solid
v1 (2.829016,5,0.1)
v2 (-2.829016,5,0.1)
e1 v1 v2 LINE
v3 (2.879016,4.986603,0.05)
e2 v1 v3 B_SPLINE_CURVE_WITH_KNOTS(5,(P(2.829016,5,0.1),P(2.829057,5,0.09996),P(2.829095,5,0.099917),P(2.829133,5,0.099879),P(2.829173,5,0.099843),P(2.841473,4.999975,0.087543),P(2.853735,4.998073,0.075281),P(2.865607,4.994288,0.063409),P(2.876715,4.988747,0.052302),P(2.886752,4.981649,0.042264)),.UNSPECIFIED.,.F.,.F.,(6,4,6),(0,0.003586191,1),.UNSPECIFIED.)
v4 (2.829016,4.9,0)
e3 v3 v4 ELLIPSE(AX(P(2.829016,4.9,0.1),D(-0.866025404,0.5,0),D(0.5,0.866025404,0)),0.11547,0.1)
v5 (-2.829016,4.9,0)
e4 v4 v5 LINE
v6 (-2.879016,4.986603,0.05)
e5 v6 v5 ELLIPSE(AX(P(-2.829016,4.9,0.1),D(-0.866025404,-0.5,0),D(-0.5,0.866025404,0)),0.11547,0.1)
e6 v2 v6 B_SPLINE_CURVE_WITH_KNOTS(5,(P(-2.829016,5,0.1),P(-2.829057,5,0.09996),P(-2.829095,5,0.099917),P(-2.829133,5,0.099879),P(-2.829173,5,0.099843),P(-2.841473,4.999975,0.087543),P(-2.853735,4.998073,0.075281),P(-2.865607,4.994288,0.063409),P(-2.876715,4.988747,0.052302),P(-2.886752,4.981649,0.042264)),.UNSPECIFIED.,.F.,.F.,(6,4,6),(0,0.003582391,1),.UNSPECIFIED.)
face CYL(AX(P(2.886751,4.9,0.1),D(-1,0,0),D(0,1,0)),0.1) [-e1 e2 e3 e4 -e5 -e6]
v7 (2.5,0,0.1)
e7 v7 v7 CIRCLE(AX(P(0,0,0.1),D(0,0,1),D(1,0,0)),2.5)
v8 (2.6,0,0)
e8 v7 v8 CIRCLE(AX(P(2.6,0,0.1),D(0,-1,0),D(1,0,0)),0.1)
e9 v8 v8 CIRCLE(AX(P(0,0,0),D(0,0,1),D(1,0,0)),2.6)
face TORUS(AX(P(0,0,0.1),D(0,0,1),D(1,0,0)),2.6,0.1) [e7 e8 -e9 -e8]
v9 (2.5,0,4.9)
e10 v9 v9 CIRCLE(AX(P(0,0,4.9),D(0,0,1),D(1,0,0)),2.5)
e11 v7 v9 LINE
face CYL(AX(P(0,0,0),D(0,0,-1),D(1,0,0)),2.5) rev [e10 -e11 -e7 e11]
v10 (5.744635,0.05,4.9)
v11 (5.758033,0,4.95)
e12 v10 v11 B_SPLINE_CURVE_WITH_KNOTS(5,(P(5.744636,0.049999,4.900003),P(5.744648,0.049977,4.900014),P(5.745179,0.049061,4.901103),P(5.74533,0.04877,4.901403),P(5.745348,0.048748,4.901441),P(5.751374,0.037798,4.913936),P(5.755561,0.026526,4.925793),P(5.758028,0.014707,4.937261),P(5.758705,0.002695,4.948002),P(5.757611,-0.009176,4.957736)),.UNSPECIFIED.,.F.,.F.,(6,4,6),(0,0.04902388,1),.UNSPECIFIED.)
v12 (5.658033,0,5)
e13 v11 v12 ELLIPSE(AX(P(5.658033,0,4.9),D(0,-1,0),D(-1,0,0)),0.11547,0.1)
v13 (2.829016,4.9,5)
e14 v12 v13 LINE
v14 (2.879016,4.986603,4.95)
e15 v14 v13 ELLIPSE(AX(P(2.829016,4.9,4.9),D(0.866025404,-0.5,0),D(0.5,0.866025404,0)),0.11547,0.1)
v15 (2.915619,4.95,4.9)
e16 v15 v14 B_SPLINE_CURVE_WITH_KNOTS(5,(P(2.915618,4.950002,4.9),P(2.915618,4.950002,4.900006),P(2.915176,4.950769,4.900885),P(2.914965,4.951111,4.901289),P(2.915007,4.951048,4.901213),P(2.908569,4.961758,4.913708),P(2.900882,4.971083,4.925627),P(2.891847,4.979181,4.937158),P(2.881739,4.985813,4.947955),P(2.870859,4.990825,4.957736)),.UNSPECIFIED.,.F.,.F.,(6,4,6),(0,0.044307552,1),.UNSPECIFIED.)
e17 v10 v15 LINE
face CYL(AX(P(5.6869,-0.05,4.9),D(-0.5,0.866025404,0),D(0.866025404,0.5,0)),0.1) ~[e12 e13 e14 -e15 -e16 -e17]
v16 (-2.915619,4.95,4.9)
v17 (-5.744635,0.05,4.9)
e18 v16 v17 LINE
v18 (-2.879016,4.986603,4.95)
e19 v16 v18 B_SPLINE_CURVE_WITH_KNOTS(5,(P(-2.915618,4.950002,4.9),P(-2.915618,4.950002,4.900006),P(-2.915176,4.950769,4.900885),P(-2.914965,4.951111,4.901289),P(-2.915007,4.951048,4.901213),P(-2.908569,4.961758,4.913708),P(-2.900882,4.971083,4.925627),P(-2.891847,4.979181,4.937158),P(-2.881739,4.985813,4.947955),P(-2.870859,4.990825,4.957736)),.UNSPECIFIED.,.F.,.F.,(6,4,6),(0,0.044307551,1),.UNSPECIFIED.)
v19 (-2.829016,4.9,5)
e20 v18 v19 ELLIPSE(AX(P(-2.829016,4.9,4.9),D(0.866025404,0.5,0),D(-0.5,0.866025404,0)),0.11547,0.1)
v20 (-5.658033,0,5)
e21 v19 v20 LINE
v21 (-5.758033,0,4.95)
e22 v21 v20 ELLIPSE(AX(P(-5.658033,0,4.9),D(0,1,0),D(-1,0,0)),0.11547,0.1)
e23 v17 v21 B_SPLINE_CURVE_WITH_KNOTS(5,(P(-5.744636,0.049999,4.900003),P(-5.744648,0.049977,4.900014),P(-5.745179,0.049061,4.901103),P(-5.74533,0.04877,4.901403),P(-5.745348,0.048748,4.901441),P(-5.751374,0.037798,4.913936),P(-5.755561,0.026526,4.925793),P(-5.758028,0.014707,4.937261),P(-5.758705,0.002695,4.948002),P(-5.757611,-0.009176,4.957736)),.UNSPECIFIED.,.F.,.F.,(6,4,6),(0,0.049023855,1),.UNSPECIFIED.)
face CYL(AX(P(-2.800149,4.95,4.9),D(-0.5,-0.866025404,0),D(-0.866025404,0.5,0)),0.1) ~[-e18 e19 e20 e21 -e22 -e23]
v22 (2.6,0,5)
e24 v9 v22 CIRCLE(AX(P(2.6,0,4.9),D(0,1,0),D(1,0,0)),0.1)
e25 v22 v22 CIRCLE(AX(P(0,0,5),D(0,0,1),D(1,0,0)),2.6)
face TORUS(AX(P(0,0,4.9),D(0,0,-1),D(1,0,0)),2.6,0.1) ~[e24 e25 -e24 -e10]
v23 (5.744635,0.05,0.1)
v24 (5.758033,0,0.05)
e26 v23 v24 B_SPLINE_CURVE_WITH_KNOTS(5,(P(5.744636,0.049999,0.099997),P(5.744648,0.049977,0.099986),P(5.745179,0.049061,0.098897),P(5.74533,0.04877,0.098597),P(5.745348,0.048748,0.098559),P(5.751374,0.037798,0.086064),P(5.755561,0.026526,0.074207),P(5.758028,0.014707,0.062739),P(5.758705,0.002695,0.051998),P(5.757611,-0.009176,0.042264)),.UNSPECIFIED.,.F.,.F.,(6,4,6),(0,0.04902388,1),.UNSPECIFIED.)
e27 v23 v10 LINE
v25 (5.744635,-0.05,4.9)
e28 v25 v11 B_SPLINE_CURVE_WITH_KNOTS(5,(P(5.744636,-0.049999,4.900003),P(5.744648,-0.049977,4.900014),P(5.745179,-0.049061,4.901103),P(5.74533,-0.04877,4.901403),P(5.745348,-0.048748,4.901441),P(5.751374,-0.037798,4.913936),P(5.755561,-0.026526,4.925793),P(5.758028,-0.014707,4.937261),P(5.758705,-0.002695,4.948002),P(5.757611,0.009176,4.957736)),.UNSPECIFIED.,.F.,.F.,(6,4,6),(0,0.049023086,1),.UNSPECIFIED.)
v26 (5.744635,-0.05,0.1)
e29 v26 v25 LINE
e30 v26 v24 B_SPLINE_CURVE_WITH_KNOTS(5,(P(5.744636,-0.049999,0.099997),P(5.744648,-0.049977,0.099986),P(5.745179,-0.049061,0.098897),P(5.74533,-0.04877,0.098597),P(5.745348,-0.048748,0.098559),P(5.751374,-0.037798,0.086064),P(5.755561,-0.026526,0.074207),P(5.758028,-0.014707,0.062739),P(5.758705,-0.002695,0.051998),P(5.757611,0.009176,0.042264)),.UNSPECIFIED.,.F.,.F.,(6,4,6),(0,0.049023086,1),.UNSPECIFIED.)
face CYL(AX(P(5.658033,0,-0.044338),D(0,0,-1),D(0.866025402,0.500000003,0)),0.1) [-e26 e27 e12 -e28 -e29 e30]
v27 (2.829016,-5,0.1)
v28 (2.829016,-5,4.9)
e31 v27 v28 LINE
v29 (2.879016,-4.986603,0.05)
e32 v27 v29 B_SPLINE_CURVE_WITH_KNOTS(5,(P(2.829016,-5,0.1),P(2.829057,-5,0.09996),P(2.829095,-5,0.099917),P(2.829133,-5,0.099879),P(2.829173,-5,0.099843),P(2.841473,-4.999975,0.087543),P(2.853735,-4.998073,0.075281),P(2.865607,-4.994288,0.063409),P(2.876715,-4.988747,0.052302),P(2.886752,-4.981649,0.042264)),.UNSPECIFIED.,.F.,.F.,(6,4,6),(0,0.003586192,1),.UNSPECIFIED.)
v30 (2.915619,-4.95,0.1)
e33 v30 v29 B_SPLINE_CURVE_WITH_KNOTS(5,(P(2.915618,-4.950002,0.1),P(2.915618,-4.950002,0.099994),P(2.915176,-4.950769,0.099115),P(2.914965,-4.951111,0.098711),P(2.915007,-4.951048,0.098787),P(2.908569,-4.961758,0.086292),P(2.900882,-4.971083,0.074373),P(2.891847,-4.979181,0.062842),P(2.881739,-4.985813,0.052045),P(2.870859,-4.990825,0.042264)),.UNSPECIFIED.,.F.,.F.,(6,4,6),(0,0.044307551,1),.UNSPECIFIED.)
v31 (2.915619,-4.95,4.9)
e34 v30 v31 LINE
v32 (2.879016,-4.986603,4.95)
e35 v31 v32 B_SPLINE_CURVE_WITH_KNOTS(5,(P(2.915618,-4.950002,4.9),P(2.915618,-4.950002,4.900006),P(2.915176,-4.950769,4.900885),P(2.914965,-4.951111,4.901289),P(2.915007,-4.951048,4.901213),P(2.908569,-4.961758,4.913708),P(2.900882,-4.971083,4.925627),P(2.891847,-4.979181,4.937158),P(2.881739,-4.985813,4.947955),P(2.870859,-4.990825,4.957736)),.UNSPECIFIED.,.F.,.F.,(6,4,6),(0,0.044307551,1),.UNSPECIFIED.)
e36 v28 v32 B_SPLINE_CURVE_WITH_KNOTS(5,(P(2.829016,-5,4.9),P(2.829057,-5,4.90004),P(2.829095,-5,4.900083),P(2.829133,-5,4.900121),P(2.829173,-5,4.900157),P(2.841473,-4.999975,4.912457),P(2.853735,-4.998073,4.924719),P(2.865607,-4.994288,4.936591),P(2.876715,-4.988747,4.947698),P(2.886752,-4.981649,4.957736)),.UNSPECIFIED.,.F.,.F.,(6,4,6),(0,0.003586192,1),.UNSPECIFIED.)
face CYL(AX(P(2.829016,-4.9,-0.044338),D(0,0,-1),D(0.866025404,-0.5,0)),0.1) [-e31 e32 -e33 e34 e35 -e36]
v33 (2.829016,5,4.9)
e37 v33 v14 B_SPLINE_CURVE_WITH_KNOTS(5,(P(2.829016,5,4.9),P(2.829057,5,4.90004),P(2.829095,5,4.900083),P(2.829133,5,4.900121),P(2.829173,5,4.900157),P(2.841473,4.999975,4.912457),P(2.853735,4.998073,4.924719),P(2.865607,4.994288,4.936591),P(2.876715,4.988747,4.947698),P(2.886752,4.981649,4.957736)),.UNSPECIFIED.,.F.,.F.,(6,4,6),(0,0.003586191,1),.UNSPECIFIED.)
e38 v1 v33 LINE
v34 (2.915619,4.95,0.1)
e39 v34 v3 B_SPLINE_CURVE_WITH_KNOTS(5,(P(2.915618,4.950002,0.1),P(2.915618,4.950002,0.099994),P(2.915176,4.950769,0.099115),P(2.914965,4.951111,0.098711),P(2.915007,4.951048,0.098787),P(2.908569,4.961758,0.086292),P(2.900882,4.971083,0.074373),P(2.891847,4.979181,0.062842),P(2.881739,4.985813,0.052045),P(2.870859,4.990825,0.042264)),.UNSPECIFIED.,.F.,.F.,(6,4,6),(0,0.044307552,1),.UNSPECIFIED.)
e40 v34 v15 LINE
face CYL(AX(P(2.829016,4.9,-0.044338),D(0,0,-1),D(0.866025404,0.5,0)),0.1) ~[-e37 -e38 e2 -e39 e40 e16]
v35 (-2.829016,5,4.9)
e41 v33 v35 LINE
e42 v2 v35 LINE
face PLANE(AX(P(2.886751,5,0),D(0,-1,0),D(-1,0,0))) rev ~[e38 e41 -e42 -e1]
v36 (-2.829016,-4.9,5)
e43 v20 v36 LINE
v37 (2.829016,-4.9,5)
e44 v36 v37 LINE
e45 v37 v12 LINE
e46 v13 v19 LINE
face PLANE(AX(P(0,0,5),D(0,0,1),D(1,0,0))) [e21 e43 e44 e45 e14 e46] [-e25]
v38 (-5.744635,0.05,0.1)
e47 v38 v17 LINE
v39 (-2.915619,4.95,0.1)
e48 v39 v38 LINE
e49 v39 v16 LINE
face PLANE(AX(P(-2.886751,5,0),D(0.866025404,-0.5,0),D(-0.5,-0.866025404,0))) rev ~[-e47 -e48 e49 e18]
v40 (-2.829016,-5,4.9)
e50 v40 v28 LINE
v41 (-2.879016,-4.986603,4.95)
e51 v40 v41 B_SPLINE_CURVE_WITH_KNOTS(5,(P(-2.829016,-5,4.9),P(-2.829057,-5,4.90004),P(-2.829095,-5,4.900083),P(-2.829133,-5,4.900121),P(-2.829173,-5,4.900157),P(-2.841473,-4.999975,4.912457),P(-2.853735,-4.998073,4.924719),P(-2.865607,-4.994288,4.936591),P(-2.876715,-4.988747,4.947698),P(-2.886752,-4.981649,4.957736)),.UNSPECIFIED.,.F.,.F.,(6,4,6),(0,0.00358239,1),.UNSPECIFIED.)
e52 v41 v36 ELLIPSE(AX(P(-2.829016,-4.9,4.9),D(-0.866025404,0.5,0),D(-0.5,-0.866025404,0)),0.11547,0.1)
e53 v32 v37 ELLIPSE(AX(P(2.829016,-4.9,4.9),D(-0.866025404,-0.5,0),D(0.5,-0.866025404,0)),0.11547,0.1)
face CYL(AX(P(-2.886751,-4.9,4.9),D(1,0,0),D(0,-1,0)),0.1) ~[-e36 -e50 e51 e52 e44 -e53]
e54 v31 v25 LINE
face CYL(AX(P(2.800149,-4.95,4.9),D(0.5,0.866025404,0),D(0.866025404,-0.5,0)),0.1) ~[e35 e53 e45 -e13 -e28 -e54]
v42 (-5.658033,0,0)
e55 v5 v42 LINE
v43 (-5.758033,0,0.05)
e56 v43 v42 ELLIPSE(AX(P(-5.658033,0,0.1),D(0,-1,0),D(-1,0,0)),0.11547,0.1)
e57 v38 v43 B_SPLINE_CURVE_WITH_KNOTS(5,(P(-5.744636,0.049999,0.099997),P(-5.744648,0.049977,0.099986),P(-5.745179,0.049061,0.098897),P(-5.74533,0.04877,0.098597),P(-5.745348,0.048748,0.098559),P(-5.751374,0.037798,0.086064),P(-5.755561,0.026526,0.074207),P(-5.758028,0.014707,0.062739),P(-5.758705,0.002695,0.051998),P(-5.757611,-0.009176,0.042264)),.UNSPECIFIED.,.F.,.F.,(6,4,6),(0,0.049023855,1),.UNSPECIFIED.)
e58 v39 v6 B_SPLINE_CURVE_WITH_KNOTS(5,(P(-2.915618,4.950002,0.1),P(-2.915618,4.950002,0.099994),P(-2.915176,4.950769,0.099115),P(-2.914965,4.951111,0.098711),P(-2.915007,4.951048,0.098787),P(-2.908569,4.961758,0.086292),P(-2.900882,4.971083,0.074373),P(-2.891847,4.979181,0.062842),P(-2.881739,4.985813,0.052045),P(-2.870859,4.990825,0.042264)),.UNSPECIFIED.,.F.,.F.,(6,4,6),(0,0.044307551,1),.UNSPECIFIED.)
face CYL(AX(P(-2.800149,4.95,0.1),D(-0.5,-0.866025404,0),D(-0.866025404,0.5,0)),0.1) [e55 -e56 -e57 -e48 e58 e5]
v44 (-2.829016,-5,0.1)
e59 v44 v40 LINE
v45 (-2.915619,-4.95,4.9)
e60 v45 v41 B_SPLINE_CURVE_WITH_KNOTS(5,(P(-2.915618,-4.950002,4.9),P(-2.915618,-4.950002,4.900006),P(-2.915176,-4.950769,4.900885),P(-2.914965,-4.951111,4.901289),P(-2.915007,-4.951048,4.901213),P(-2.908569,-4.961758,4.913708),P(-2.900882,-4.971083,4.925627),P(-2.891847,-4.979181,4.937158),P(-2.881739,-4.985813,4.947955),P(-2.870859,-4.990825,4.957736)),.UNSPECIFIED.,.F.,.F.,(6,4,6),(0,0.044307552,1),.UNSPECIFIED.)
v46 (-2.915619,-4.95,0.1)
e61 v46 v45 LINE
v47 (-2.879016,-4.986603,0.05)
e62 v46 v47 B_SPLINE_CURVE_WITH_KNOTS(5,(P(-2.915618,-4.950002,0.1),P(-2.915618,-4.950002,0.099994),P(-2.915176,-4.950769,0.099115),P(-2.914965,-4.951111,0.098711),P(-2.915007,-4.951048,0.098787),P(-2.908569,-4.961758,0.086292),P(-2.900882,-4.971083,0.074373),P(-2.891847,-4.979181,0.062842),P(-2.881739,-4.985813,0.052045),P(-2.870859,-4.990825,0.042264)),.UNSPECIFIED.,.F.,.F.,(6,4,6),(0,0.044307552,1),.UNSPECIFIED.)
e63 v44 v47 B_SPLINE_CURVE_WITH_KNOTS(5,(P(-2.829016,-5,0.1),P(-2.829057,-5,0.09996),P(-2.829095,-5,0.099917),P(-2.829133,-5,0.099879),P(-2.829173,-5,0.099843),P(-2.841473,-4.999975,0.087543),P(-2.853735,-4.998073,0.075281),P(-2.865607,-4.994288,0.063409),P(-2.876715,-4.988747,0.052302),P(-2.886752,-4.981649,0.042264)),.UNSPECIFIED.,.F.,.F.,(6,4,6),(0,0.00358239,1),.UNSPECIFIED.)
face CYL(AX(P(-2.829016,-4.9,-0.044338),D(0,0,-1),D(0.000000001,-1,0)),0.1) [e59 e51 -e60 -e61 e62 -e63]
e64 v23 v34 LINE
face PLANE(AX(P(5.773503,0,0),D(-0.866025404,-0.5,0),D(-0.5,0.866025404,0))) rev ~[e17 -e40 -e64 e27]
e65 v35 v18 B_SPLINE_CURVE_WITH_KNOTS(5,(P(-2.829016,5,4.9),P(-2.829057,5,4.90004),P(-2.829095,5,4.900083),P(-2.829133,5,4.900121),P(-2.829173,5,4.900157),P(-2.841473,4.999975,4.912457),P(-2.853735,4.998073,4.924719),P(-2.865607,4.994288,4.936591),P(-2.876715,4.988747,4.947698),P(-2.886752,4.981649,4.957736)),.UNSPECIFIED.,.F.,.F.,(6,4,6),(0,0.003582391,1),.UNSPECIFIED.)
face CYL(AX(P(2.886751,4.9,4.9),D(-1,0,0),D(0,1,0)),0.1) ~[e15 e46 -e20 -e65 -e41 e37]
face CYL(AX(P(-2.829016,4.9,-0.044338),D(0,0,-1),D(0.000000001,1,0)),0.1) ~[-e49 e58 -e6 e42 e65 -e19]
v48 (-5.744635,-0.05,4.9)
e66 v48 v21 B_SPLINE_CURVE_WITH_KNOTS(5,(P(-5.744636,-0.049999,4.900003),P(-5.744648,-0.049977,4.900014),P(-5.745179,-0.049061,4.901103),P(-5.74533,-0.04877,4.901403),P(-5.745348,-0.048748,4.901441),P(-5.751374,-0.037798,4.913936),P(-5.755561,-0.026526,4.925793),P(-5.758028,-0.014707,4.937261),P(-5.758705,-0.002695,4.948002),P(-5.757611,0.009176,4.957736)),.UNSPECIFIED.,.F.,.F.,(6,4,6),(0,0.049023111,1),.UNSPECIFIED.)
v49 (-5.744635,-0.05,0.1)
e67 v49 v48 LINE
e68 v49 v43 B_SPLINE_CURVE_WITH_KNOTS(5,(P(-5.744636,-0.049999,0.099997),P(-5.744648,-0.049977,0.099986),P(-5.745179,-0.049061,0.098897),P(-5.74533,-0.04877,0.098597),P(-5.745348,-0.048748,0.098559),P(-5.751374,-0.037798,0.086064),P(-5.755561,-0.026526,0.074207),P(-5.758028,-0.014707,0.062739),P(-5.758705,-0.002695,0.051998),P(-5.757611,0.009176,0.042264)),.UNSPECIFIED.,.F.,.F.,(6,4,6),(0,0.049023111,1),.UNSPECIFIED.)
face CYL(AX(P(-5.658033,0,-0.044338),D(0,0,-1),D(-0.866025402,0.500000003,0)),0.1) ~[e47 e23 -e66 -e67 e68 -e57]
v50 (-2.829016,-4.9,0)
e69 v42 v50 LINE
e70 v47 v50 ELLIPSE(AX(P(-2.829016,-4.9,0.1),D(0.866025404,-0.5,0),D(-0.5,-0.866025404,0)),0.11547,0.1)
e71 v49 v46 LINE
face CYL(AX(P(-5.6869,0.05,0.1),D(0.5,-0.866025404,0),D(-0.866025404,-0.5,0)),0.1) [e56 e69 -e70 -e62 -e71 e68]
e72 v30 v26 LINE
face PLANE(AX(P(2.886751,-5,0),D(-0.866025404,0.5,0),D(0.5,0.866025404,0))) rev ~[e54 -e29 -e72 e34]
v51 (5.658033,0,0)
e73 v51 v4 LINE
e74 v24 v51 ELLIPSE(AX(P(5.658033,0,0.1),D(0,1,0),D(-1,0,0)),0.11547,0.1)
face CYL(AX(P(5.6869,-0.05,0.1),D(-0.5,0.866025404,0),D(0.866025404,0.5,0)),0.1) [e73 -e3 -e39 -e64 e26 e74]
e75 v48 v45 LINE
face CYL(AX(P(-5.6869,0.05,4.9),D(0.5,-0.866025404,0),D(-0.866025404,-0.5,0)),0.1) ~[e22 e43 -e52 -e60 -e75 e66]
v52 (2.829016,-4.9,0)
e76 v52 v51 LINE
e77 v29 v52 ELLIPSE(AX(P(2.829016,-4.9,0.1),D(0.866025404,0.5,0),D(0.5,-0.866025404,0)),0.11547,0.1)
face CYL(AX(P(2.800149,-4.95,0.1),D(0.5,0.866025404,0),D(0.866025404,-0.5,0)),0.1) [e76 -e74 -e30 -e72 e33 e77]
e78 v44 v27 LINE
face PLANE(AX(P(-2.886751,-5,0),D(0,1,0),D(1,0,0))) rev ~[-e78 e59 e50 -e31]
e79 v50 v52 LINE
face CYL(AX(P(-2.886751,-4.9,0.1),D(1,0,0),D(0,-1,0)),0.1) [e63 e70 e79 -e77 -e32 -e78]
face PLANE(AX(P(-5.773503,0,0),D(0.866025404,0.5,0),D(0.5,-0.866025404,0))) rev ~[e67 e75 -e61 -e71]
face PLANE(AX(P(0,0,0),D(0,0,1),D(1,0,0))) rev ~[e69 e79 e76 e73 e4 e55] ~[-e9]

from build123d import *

# Parameters (mm, degrees)
F0_R        = 2.5
F1_DEPTH    = 5
F2_R        = 0.1
F3_T1_DEPTH = 5.0886751346


# Not quite as in the source:
# - a fillet or chamfer that OpenCascade refuses, or shapes differently, is made with other operations: its cross-section is extruded or revolved along the edge and cut away or added


with BuildPart() as f1:
    # F0 (on Top) → F1 (new body)
    with BuildSketch(Plane.XY):
        Polygon((2.8867513459, 5), (-2.8867513459, 5), (-5.7735026919, 0), (-2.8867513459, -5), (2.8867513459, -5), (5.7735026919, 0), align=None)
        Circle(F0_R, mode=Mode.SUBTRACT)
    extrude(amount=F1_DEPTH)

    # F2
    f2_edges = [f1.edges().sort_by_distance(p)[0] for p in [
        (4.330127, 2.5, 0),
        (0, 5, 0),
        (-4.330127, 2.5, 0),
        (-4.330127, -2.5, 0),
        (0, -5, 0),
        (4.330127, -2.5, 0),
        (-2.5, 0, 0),
        (4.330127, 2.5, 5),
        (0, 5, 5),
        (-4.330127, 2.5, 5),
        (-4.330127, -2.5, 5),
        (0, -5, 5),
        (4.330127, -2.5, 5),
        (-2.5, 0, 5),
    ]]
    fillet(f2_edges, radius=F2_R)

    # F3: fillet of radius 0.1 on 18 edges, made by hand

    # F3_s2 → F3_t1 (cut)
    with BuildSketch(Plane.XY.offset(-0.0443375673)):
        with BuildLine():
            ThreePointArc((-2.829016319, 5), (-2.879016319, 4.9866025404), (-2.9156188594, 4.95))
            Line((-2.9156188594, 4.95), (-2.8867513459, 5))
            Line((-2.8867513459, 5), (-2.829016319, 5))
        make_face()
        with BuildLine():
            ThreePointArc((-5.7446351784, 0.05), (-5.7580326381, 0), (-5.7446351784, -0.05))
            Line((-5.7446351784, -0.05), (-5.7735026919, 0))
            Line((-5.7735026919, 0), (-5.7446351784, 0.05))
        make_face()
        with BuildLine():
            ThreePointArc((2.9156188594, 4.95), (2.879016319, 4.9866025404), (2.829016319, 5))
            Line((2.829016319, 5), (2.8867513459, 5))
            Line((2.8867513459, 5), (2.9156188594, 4.95))
        make_face()
        with BuildLine():
            ThreePointArc((5.7446351784, 0.05), (5.7580326381, 0), (5.7446351784, -0.05))
            Line((5.7446351784, -0.05), (5.7735026919, 0))
            Line((5.7735026919, 0), (5.7446351784, 0.05))
        make_face()
        with BuildLine():
            ThreePointArc((-2.829016319, -5), (-2.879016319, -4.9866025404), (-2.9156188594, -4.95))
            Line((-2.9156188594, -4.95), (-2.8867513459, -5))
            Line((-2.8867513459, -5), (-2.829016319, -5))
        make_face()
        with BuildLine():
            ThreePointArc((2.9156188594, -4.95), (2.879016319, -4.9866025404), (2.829016319, -5))
            Line((2.829016319, -5), (2.8867513459, -5))
            Line((2.8867513459, -5), (2.9156188594, -4.95))
        make_face()
    extrude(amount=F3_T1_DEPTH, mode=Mode.SUBTRACT)


solid = f1.part
